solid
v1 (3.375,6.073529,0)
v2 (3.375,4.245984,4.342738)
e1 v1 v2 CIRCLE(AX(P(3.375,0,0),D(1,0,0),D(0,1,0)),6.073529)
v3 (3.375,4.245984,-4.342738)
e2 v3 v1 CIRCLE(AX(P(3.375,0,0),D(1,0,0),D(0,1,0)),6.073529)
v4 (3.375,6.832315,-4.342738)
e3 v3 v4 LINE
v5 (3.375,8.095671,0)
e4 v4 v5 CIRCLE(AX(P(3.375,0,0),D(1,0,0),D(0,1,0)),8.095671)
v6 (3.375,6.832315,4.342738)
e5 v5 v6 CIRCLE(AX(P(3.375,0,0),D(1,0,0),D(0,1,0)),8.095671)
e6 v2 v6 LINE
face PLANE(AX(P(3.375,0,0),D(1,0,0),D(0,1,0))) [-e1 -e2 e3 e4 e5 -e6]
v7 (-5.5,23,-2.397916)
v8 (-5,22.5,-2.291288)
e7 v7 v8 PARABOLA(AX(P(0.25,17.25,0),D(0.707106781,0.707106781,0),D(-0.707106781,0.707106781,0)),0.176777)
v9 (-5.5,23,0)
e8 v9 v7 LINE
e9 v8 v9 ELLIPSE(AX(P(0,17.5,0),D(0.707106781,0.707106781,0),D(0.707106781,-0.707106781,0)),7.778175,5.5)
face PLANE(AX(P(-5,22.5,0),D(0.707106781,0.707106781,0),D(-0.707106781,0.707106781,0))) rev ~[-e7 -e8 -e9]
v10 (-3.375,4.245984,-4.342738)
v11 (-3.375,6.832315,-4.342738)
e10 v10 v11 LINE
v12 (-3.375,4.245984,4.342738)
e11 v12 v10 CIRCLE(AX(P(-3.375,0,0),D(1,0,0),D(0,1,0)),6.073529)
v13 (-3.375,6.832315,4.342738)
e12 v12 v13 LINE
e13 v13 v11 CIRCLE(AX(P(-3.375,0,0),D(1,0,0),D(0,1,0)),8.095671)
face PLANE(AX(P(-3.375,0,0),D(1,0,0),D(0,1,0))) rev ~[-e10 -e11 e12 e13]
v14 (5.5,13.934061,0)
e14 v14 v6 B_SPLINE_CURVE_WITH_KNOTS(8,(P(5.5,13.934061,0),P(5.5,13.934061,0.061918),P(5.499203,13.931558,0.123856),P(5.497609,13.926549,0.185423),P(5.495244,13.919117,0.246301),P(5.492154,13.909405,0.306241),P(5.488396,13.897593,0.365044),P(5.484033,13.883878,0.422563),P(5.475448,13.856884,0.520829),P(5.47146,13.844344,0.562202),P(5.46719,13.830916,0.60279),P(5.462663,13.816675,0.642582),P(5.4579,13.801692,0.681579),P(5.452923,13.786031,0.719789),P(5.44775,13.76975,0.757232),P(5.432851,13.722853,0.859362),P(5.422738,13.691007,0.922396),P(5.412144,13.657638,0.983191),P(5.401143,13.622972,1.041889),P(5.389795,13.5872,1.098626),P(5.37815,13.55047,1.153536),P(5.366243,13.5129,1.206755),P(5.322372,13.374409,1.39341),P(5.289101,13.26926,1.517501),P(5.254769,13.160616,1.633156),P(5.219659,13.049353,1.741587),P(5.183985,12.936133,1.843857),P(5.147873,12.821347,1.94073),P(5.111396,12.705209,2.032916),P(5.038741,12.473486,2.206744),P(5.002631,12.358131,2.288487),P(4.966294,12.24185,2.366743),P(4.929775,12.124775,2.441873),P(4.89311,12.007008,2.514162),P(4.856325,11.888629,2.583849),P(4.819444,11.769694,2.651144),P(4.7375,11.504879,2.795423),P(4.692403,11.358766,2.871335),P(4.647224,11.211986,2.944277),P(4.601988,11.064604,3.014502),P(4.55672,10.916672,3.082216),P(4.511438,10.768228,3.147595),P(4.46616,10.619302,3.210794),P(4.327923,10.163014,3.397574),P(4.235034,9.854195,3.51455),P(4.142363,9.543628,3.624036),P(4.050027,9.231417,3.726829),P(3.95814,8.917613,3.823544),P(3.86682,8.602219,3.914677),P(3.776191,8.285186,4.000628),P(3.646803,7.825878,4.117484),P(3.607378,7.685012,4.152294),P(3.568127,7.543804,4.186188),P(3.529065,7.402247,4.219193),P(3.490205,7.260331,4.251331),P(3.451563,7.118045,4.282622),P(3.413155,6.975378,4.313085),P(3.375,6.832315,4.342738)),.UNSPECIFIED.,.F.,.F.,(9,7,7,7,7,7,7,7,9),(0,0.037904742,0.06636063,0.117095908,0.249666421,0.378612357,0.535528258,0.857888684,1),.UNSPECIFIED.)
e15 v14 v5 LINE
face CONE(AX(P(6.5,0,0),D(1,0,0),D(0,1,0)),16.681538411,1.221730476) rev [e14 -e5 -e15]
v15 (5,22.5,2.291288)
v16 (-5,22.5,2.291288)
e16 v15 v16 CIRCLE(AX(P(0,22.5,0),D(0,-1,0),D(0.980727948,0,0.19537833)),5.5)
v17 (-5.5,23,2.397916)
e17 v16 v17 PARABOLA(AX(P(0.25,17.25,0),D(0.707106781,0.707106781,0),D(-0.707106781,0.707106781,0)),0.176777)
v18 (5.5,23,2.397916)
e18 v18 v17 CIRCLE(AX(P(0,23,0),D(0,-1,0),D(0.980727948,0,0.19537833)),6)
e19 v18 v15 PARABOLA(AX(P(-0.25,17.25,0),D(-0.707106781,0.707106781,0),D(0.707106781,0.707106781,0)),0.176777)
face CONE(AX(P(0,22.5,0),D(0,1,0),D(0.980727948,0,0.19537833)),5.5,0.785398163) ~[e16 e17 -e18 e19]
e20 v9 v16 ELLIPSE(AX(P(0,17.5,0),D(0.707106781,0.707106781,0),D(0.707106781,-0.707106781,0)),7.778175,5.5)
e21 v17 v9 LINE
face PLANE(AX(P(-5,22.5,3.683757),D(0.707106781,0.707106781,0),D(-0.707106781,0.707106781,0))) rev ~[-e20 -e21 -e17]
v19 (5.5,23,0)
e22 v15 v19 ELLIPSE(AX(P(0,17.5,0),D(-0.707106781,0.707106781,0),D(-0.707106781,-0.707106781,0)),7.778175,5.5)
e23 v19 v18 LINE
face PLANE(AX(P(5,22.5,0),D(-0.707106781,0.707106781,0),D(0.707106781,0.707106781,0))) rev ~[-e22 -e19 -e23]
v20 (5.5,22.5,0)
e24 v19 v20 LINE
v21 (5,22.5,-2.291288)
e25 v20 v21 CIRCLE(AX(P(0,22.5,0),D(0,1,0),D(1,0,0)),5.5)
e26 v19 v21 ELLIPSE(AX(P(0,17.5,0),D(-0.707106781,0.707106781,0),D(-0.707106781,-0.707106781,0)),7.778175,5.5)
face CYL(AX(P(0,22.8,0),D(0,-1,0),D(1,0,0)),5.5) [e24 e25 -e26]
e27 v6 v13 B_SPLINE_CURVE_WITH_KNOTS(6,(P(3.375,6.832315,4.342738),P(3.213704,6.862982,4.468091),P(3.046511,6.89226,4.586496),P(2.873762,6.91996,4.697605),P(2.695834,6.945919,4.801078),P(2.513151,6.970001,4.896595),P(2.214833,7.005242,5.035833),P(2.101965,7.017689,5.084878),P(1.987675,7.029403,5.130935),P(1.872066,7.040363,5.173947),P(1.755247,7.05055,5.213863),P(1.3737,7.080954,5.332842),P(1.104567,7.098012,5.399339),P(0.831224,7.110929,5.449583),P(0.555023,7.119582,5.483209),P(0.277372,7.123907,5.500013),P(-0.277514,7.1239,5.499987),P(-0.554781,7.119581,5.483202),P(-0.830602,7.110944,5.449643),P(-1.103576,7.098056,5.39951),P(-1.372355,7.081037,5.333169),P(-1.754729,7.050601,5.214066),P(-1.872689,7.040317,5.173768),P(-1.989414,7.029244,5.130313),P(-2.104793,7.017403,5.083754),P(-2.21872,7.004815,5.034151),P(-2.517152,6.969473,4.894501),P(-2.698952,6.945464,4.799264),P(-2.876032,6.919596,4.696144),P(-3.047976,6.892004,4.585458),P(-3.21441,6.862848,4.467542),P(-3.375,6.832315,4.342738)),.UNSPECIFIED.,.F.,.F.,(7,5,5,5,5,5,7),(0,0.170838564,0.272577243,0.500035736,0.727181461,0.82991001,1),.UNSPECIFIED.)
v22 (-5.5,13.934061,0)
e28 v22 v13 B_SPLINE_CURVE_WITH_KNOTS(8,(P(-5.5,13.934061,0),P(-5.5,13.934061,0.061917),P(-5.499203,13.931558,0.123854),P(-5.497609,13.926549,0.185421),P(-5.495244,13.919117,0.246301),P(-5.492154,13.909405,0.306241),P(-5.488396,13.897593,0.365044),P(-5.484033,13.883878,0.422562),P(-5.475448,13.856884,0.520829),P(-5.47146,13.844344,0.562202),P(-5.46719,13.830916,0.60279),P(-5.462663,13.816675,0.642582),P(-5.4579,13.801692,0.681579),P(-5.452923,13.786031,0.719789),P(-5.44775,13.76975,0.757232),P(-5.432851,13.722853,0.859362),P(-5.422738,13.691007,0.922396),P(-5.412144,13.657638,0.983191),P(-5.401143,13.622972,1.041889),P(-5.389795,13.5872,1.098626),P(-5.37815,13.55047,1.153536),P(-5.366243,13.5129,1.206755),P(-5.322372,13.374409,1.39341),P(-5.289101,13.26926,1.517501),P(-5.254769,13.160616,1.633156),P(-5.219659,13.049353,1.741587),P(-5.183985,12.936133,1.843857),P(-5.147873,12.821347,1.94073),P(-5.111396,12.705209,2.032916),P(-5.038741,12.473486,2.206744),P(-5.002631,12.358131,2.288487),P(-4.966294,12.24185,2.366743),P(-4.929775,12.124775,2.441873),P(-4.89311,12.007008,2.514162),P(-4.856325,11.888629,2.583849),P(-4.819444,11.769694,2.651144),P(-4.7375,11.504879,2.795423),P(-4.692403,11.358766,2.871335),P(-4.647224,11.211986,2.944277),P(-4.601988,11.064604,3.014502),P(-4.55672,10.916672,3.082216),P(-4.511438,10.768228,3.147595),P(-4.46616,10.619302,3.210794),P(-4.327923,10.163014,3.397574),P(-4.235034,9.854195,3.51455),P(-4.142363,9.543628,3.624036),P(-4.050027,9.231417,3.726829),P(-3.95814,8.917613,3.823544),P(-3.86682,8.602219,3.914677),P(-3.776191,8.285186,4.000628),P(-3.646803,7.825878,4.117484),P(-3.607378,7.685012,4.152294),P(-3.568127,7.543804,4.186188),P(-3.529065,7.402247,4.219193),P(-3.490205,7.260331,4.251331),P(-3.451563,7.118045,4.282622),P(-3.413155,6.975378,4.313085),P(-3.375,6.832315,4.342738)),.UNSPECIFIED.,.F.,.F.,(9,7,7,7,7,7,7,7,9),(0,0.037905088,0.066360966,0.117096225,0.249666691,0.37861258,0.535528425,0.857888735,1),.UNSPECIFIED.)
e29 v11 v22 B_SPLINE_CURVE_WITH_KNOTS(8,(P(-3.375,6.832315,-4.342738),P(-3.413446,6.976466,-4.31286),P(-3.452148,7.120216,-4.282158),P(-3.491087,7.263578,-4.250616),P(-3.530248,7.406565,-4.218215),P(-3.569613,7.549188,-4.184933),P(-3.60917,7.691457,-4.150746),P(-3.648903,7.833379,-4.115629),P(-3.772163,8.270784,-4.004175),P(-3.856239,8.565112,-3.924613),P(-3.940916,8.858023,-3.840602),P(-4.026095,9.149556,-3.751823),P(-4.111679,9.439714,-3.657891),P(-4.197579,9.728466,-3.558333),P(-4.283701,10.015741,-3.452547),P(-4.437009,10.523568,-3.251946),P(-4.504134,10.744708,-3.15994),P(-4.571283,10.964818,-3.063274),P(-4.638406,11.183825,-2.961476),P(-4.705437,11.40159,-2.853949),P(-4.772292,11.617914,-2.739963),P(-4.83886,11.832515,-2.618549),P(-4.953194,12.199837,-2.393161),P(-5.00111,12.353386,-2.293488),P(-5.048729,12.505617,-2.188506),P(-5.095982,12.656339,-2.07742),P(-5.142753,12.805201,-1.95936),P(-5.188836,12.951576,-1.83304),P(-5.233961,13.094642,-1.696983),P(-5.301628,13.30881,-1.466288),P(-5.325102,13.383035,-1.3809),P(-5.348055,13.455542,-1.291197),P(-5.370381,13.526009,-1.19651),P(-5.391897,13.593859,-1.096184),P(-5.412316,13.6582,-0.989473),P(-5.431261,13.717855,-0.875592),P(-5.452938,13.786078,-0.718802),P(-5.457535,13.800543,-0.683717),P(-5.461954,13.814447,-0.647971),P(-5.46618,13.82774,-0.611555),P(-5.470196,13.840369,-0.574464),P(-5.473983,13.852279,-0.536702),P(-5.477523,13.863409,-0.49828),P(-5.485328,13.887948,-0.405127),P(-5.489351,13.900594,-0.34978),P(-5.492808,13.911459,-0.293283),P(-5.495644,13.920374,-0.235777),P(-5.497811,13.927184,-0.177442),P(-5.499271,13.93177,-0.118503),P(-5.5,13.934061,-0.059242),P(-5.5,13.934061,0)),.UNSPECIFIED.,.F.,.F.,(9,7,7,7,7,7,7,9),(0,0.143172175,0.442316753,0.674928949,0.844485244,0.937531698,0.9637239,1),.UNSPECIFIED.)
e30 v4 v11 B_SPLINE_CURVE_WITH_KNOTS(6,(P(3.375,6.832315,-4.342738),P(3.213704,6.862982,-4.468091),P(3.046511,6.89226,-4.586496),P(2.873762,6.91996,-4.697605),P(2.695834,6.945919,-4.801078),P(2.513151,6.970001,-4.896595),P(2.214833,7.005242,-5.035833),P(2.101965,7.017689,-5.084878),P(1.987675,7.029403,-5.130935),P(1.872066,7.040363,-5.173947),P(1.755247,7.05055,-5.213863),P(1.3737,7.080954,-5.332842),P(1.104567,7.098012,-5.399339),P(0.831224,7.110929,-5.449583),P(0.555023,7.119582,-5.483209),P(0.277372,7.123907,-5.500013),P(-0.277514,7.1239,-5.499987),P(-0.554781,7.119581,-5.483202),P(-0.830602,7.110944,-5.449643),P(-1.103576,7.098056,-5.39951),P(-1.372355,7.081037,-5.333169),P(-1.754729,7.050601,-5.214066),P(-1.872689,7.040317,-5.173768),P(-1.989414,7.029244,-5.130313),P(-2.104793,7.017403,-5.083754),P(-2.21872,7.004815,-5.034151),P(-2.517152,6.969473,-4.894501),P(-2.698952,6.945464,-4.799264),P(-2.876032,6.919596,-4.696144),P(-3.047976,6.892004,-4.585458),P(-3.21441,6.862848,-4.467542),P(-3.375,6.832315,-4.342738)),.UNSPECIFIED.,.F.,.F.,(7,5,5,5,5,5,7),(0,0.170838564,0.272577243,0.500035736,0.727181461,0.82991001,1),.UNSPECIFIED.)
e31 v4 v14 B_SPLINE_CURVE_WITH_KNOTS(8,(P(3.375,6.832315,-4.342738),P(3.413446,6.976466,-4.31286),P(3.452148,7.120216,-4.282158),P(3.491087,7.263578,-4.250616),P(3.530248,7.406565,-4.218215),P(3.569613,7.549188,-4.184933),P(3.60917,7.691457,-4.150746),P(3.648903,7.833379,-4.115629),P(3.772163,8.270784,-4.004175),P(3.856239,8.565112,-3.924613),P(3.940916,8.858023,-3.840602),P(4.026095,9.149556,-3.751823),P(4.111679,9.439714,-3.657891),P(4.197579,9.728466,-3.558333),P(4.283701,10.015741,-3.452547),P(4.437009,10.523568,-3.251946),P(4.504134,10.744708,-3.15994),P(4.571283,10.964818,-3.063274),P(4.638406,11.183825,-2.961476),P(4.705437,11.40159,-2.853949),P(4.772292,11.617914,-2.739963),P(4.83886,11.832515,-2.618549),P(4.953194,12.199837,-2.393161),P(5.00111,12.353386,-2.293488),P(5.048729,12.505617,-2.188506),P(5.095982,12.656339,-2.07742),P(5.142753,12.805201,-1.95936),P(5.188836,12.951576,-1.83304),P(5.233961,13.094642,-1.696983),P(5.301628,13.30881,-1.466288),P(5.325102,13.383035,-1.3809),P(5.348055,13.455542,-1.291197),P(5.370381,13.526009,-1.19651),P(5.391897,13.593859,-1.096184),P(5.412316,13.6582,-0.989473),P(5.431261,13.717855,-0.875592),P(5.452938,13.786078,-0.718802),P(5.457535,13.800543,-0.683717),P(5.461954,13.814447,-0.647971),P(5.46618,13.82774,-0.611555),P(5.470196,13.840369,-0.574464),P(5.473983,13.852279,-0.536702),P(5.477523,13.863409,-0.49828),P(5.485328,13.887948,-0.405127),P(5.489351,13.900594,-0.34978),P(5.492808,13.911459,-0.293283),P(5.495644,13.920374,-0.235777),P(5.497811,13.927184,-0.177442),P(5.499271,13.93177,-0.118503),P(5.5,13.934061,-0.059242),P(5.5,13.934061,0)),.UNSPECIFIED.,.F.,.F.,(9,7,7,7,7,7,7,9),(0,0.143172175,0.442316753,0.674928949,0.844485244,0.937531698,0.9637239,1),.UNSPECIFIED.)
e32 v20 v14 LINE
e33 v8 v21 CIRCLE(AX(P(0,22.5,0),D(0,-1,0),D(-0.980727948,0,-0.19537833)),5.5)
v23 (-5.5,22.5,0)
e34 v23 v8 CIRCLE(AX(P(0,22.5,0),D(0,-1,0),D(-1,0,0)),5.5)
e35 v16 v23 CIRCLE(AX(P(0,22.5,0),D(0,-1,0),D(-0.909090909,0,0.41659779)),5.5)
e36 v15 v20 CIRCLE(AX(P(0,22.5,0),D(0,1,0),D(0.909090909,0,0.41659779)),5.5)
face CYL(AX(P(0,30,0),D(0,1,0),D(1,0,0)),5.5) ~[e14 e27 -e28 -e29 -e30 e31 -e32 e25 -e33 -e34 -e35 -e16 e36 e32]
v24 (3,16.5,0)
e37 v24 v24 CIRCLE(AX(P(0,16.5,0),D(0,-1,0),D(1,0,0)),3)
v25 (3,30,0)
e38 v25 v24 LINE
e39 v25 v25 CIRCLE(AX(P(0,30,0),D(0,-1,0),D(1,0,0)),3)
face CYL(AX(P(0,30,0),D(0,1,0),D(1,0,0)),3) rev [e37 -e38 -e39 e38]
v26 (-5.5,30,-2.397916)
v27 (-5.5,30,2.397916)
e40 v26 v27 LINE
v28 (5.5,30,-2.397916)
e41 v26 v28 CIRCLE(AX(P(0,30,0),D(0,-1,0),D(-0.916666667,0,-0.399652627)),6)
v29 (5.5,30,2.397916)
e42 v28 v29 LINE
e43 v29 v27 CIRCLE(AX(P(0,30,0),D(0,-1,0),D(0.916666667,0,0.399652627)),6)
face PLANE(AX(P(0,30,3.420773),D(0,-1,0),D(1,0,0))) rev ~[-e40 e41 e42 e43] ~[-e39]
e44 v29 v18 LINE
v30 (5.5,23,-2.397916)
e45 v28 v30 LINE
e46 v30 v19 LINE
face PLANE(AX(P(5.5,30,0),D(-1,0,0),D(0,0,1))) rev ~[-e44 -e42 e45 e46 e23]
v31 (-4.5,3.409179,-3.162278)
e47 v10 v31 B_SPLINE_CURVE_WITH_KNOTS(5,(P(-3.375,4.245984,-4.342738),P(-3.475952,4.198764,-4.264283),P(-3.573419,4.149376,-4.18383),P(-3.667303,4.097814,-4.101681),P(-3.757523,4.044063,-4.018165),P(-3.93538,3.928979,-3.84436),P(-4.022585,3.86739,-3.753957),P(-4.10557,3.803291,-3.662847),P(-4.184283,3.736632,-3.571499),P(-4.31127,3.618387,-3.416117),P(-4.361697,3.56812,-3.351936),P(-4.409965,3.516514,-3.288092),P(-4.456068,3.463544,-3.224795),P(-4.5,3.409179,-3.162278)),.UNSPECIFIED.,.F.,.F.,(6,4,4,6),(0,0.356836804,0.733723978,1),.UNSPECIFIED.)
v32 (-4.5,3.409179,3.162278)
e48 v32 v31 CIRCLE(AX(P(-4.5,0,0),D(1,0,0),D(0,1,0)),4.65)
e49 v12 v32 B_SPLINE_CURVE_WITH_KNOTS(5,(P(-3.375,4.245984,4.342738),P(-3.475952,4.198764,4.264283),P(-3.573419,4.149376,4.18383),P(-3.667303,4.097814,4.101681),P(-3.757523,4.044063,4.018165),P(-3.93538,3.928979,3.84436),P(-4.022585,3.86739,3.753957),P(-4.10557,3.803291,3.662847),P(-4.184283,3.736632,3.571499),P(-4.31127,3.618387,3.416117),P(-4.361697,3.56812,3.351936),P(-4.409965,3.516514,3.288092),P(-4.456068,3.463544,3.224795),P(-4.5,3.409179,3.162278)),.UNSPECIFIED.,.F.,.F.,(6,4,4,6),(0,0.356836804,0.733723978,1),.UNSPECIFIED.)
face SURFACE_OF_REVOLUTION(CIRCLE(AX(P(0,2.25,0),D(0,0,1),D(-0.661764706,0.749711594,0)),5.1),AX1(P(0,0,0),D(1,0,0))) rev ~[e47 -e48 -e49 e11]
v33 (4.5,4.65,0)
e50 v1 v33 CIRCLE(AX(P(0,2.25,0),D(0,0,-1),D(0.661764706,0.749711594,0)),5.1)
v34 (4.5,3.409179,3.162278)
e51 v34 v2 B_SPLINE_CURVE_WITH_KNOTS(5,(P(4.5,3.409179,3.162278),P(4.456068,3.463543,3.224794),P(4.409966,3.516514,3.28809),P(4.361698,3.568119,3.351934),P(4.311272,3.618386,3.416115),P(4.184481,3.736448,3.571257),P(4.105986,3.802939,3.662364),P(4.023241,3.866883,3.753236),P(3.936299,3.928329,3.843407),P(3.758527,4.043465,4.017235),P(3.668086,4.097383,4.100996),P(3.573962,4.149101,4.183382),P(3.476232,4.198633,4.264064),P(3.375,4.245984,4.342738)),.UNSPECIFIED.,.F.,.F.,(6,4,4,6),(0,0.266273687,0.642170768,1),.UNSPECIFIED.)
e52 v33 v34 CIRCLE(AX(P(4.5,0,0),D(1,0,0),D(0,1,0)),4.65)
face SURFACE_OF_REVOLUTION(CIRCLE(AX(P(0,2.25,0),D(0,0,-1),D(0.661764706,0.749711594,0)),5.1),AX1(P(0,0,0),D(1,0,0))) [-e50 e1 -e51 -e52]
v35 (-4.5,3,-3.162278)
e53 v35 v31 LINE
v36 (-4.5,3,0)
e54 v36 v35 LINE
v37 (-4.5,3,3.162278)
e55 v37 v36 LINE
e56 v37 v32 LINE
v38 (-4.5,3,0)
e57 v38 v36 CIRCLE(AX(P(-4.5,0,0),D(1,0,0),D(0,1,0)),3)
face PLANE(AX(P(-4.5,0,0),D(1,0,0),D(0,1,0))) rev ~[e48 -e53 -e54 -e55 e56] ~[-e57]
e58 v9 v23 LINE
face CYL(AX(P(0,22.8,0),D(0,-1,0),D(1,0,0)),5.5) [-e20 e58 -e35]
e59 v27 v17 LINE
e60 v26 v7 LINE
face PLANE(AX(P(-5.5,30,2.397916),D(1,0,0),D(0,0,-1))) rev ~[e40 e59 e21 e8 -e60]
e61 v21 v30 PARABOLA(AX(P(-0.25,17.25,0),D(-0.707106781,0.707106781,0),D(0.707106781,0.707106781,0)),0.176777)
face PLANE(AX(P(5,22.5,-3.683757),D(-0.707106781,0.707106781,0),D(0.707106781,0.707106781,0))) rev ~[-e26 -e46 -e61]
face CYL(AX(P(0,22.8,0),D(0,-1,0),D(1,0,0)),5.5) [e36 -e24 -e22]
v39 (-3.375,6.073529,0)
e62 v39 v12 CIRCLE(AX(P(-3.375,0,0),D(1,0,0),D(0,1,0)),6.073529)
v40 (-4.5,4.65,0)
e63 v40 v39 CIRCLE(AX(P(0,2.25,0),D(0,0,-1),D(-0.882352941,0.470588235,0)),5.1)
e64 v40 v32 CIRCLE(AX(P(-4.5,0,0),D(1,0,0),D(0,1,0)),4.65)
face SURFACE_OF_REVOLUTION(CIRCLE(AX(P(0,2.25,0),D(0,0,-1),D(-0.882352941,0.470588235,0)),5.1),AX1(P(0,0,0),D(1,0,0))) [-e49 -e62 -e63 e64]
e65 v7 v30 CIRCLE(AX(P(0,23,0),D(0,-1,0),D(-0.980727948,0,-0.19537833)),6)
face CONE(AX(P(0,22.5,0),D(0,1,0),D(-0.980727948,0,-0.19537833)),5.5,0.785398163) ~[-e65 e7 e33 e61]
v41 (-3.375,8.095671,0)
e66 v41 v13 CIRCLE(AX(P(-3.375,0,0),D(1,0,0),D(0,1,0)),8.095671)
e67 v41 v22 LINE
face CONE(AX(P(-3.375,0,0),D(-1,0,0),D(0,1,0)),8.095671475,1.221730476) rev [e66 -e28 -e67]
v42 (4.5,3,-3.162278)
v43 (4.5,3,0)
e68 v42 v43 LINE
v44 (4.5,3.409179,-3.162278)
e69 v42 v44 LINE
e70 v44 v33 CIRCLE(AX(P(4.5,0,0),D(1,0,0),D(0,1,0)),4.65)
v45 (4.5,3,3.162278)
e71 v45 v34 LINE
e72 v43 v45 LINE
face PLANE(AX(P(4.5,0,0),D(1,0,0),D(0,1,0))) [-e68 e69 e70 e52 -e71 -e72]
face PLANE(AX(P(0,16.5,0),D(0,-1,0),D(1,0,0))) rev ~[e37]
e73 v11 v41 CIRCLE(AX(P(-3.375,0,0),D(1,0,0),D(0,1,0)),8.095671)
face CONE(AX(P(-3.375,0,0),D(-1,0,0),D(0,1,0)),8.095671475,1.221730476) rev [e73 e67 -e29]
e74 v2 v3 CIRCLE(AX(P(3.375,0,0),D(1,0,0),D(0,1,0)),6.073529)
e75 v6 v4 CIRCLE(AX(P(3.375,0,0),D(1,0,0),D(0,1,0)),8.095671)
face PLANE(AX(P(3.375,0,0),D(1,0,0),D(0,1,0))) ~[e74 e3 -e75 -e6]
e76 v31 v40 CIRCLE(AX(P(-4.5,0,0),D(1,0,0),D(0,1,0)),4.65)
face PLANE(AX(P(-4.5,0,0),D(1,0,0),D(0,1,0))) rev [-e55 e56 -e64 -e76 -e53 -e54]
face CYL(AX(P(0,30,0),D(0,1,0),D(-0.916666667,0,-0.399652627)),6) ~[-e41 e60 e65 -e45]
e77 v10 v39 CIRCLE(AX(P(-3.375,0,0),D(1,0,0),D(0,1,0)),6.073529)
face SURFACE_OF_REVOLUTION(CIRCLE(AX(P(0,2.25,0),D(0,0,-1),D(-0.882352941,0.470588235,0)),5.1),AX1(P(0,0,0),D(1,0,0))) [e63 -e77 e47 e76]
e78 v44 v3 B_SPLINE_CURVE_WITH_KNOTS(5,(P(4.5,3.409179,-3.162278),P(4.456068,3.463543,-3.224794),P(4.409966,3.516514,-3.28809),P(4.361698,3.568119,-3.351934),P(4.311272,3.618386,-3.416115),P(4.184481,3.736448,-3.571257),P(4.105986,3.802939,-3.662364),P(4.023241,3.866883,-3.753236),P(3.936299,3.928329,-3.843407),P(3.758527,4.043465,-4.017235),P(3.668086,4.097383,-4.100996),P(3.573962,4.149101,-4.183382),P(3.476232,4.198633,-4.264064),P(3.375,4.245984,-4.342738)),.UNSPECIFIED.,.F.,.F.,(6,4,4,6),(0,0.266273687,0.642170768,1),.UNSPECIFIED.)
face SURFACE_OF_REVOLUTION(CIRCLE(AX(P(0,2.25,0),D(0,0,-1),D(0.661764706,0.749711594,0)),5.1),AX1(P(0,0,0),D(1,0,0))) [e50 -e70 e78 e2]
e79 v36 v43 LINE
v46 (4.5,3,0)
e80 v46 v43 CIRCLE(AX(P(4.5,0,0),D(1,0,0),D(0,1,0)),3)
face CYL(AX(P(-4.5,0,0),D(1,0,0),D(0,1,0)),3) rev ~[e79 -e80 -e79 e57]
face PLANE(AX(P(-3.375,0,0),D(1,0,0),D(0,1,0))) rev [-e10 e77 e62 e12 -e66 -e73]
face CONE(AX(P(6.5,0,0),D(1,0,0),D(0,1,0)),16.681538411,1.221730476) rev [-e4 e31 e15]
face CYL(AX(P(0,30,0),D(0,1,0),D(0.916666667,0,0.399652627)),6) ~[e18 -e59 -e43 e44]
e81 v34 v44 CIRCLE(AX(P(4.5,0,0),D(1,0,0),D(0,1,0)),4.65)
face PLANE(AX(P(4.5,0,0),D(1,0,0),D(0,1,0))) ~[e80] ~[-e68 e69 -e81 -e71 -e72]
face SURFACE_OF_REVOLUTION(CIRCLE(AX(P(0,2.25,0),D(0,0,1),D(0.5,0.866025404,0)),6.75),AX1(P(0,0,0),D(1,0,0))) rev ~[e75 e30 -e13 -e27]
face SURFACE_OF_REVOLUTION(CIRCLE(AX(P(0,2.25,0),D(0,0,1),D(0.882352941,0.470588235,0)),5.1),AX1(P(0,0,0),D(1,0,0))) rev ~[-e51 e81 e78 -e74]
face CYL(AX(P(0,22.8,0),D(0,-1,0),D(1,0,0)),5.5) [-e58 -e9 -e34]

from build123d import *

# Parameters (mm, degrees)
F9_R          = 3
F10_DEPTH     = 27
F11_DEPTH     = 7.5
F12_DEPTH     = 13.5
F13_T2_ANGLE  = 157.4663491
F13_T6_DEPTH  = 3.6837572556
F13_S7_R      = 5.5
F13_T8_DEPTH  = 3
F13_T12_DEPTH = 3.6837572556
F13_S13_R     = 5.5
F13_T14_DEPTH = 3
F13_T16_ANGLE = 157.4663491
F13_T20_DEPTH = 3.6837572556
F13_S21_R     = 5.5
F13_T22_DEPTH = 3
F13_T26_DEPTH = 3.6837572556
F13_S27_R     = 5.5
F13_T28_DEPTH = 3


# Not quite as in the source:
# - a fillet or chamfer that OpenCascade refuses, or shapes differently, is made with other operations: its cross-section is extruded or revolved along the edge and cut away or added


with BuildPart() as f7:
    # F6 (on Top) → F7 (revolve)
    with BuildSketch(Plane.XY):
        with BuildLine():
            Line((-4.5, 4.65), (-4.5, 3))
            Line((-4.5, 3), (4.5, 3))
            Line((4.5, 3), (4.5, 4.65))
            ThreePointArc((4.5, 4.65), (4.0013141648, 5.4121962233), (3.375, 6.073529129))
            ThreePointArc((3.375, 6.073529129), (0, 7.35), (-3.375, 6.073529129))
            ThreePointArc((-3.375, 6.073529129), (-4.0013141648, 5.4121962233), (-4.5, 4.65))
        make_face()
        with BuildLine():
            Line((-3.375, 8.0956714755), (-3.375, 6.073529129))
            ThreePointArc((-3.375, 6.073529129), (0, 7.35), (3.375, 6.073529129))
            Line((3.375, 6.073529129), (3.375, 8.0956714755))
            ThreePointArc((3.375, 8.0956714755), (0, 9), (-3.375, 8.0956714755))
        make_face()
    revolve(axis=Axis((0, 0, 0), (1, 0, 0)))

    # F9 (on offset) → F10 (join)
    with BuildSketch(Plane.XZ.offset(-30)):
        with BuildLine():
            ThreePointArc((-5.5, 0), (0, -5.5), (5.5, 0))
            ThreePointArc((5.5, 0), (0, 5.5), (-5.5, 0))
        make_face()
        Circle(F9_R, mode=Mode.SUBTRACT)
        Circle(F9_R)
    extrude(amount=F10_DEPTH)

    # F9 (on offset) → F11 (join)
    with BuildSketch(Plane.XZ.offset(-30)):
        with BuildLine():
            ThreePointArc((-5.5, 0), (0, 5.5), (5.5, 0))
            Line((5.5, 0), (5.5, 2.3979157617))
            ThreePointArc((5.5, 2.3979157617), (0, 6), (-5.5, 2.3979157617))
            Line((-5.5, 2.3979157617), (-5.5, 0))
        make_face()
        with BuildLine():
            Line((5.5, -2.3979157617), (5.5, 0))
            ThreePointArc((5.5, 0), (0, -5.5), (-5.5, 0))
            Line((-5.5, 0), (-5.5, -2.3979157617))
            ThreePointArc((-5.5, -2.3979157617), (0, -6), (5.5, -2.3979157617))
        make_face()
    extrude(amount=F11_DEPTH)

    # F9 (on offset) → F12 (cut)
    with BuildSketch(Plane.XZ.offset(-30)):
        Circle(F9_R)
    extrude(amount=F12_DEPTH, mode=Mode.SUBTRACT)

    # F13: chamfer of 0.5 on 6 edges, made by hand

    # F13_s1 → F13_t2 (revolve, cut)
    with BuildSketch(Plane(origin=(0, 0, 0), x_dir=(0, 1, 0), z_dir=(0.1953783305, 0, -0.980727948))):
        Polygon((22.5, 5.5), (23, 6), (22.5, 6), align=None)
    revolve(axis=Axis((0, 22.5, 0), (0, -1, 0)), revolution_arc=F13_T2_ANGLE, mode=Mode.SUBTRACT)


with BuildPart() as f13_tool4:
    # F13_s5 → F13_t6 (new body)
    with BuildSketch(Plane.XY):
        Polygon((5, 22.5), (5.5, 23), (5.5, 22.5), align=None)
    extrude(amount=F13_T6_DEPTH)

    # F13_s7 → F13_t8 (cut, symmetric)
    with BuildSketch(Plane.XZ.offset(-22.8)):
        Circle(F13_S7_R)
    extrude(amount=F13_T8_DEPTH, both=True, mode=Mode.SUBTRACT)


with BuildPart() as f7_1:
    add(f7.part)

    # F13_t3: cut F13_tool4
    add(f13_tool4.part, mode=Mode.SUBTRACT)


with BuildPart() as f13_tool10:
    # F13_s11 → F13_t12 (new body)
    with BuildSketch(Plane.XY.offset(3.6837572556)):
        Polygon((-5, 22.5), (-5.5, 23), (-5.5, 22.5), align=None)
    extrude(amount=-F13_T12_DEPTH)

    # F13_s13 → F13_t14 (cut, symmetric)
    with BuildSketch(Plane.XZ.offset(-22.8)):
        Circle(F13_S13_R)
    extrude(amount=F13_T14_DEPTH, both=True, mode=Mode.SUBTRACT)


with BuildPart() as f7_2:
    add(f7_1.part)

    # F13_t9: cut F13_tool10
    add(f13_tool10.part, mode=Mode.SUBTRACT)

    # F13_s15 → F13_t16 (revolve, cut)
    with BuildSketch(Plane(origin=(0, 0, 0), x_dir=(0, 1, 0), z_dir=(-0.1953783305, 0, 0.980727948))):
        Polygon((22.5, 5.5), (23, 6), (22.5, 6), align=None)
    revolve(axis=Axis((0, 22.5, 0), (0, -1, 0)), revolution_arc=F13_T16_ANGLE, mode=Mode.SUBTRACT)


with BuildPart() as f13_tool18:
    # F13_s19 → F13_t20 (new body)
    with BuildSketch(Plane.XY.offset(-3.6837572556)):
        Polygon((5, 22.5), (5.5, 23), (5.5, 22.5), align=None)
    extrude(amount=F13_T20_DEPTH)

    # F13_s21 → F13_t22 (cut, symmetric)
    with BuildSketch(Plane.XZ.offset(-22.8)):
        Circle(F13_S21_R)
    extrude(amount=F13_T22_DEPTH, both=True, mode=Mode.SUBTRACT)


with BuildPart() as f7_3:
    add(f7_2.part)

    # F13_t17: cut F13_tool18
    add(f13_tool18.part, mode=Mode.SUBTRACT)


with BuildPart() as f13_tool24:
    # F13_s25 → F13_t26 (new body)
    with BuildSketch(Plane.XY):
        Polygon((-5, 22.5), (-5.5, 23), (-5.5, 22.5), align=None)
    extrude(amount=-F13_T26_DEPTH)

    # F13_s27 → F13_t28 (cut, symmetric)
    with BuildSketch(Plane.XZ.offset(-22.8)):
        Circle(F13_S27_R)
    extrude(amount=F13_T28_DEPTH, both=True, mode=Mode.SUBTRACT)


with BuildPart() as f7_4:
    add(f7_3.part)

    # F13_t23: cut F13_tool24
    add(f13_tool24.part, mode=Mode.SUBTRACT)

    # F6 (on Top) → F14 (revolve, cut)
    with BuildSketch(Plane.XY):
        with BuildLine():
            Line((4.5, 4.65), (4.5, 3))
            Line((4.5, 3), (6.5, 3))
            Line((6.5, 3), (6.5, 16.6815384113))
            Line((6.5, 16.6815384113), (3.375, 8.0956714755))
            Line((3.375, 8.0956714755), (3.375, 6.073529129))
            ThreePointArc((3.375, 6.073529129), (4.0013141648, 5.4121962233), (4.5, 4.65))
        make_face()
        with BuildLine():
            Line((-6.5, 3), (-4.5, 3))
            Line((-4.5, 3), (-4.5, 4.65))
            ThreePointArc((-4.5, 4.65), (-4.0013141648, 5.4121962233), (-3.375, 6.073529129))
            Line((-3.375, 6.073529129), (-3.375, 8.0956714755))
            Line((-3.375, 8.0956714755), (-6.5, 16.6815384113))
            Line((-6.5, 16.6815384113), (-6.5, 3))
        make_face()
    revolve(axis=Axis((0, 0, 0), (1, 0, 0)), mode=Mode.SUBTRACT)


solid = f7_4.part
